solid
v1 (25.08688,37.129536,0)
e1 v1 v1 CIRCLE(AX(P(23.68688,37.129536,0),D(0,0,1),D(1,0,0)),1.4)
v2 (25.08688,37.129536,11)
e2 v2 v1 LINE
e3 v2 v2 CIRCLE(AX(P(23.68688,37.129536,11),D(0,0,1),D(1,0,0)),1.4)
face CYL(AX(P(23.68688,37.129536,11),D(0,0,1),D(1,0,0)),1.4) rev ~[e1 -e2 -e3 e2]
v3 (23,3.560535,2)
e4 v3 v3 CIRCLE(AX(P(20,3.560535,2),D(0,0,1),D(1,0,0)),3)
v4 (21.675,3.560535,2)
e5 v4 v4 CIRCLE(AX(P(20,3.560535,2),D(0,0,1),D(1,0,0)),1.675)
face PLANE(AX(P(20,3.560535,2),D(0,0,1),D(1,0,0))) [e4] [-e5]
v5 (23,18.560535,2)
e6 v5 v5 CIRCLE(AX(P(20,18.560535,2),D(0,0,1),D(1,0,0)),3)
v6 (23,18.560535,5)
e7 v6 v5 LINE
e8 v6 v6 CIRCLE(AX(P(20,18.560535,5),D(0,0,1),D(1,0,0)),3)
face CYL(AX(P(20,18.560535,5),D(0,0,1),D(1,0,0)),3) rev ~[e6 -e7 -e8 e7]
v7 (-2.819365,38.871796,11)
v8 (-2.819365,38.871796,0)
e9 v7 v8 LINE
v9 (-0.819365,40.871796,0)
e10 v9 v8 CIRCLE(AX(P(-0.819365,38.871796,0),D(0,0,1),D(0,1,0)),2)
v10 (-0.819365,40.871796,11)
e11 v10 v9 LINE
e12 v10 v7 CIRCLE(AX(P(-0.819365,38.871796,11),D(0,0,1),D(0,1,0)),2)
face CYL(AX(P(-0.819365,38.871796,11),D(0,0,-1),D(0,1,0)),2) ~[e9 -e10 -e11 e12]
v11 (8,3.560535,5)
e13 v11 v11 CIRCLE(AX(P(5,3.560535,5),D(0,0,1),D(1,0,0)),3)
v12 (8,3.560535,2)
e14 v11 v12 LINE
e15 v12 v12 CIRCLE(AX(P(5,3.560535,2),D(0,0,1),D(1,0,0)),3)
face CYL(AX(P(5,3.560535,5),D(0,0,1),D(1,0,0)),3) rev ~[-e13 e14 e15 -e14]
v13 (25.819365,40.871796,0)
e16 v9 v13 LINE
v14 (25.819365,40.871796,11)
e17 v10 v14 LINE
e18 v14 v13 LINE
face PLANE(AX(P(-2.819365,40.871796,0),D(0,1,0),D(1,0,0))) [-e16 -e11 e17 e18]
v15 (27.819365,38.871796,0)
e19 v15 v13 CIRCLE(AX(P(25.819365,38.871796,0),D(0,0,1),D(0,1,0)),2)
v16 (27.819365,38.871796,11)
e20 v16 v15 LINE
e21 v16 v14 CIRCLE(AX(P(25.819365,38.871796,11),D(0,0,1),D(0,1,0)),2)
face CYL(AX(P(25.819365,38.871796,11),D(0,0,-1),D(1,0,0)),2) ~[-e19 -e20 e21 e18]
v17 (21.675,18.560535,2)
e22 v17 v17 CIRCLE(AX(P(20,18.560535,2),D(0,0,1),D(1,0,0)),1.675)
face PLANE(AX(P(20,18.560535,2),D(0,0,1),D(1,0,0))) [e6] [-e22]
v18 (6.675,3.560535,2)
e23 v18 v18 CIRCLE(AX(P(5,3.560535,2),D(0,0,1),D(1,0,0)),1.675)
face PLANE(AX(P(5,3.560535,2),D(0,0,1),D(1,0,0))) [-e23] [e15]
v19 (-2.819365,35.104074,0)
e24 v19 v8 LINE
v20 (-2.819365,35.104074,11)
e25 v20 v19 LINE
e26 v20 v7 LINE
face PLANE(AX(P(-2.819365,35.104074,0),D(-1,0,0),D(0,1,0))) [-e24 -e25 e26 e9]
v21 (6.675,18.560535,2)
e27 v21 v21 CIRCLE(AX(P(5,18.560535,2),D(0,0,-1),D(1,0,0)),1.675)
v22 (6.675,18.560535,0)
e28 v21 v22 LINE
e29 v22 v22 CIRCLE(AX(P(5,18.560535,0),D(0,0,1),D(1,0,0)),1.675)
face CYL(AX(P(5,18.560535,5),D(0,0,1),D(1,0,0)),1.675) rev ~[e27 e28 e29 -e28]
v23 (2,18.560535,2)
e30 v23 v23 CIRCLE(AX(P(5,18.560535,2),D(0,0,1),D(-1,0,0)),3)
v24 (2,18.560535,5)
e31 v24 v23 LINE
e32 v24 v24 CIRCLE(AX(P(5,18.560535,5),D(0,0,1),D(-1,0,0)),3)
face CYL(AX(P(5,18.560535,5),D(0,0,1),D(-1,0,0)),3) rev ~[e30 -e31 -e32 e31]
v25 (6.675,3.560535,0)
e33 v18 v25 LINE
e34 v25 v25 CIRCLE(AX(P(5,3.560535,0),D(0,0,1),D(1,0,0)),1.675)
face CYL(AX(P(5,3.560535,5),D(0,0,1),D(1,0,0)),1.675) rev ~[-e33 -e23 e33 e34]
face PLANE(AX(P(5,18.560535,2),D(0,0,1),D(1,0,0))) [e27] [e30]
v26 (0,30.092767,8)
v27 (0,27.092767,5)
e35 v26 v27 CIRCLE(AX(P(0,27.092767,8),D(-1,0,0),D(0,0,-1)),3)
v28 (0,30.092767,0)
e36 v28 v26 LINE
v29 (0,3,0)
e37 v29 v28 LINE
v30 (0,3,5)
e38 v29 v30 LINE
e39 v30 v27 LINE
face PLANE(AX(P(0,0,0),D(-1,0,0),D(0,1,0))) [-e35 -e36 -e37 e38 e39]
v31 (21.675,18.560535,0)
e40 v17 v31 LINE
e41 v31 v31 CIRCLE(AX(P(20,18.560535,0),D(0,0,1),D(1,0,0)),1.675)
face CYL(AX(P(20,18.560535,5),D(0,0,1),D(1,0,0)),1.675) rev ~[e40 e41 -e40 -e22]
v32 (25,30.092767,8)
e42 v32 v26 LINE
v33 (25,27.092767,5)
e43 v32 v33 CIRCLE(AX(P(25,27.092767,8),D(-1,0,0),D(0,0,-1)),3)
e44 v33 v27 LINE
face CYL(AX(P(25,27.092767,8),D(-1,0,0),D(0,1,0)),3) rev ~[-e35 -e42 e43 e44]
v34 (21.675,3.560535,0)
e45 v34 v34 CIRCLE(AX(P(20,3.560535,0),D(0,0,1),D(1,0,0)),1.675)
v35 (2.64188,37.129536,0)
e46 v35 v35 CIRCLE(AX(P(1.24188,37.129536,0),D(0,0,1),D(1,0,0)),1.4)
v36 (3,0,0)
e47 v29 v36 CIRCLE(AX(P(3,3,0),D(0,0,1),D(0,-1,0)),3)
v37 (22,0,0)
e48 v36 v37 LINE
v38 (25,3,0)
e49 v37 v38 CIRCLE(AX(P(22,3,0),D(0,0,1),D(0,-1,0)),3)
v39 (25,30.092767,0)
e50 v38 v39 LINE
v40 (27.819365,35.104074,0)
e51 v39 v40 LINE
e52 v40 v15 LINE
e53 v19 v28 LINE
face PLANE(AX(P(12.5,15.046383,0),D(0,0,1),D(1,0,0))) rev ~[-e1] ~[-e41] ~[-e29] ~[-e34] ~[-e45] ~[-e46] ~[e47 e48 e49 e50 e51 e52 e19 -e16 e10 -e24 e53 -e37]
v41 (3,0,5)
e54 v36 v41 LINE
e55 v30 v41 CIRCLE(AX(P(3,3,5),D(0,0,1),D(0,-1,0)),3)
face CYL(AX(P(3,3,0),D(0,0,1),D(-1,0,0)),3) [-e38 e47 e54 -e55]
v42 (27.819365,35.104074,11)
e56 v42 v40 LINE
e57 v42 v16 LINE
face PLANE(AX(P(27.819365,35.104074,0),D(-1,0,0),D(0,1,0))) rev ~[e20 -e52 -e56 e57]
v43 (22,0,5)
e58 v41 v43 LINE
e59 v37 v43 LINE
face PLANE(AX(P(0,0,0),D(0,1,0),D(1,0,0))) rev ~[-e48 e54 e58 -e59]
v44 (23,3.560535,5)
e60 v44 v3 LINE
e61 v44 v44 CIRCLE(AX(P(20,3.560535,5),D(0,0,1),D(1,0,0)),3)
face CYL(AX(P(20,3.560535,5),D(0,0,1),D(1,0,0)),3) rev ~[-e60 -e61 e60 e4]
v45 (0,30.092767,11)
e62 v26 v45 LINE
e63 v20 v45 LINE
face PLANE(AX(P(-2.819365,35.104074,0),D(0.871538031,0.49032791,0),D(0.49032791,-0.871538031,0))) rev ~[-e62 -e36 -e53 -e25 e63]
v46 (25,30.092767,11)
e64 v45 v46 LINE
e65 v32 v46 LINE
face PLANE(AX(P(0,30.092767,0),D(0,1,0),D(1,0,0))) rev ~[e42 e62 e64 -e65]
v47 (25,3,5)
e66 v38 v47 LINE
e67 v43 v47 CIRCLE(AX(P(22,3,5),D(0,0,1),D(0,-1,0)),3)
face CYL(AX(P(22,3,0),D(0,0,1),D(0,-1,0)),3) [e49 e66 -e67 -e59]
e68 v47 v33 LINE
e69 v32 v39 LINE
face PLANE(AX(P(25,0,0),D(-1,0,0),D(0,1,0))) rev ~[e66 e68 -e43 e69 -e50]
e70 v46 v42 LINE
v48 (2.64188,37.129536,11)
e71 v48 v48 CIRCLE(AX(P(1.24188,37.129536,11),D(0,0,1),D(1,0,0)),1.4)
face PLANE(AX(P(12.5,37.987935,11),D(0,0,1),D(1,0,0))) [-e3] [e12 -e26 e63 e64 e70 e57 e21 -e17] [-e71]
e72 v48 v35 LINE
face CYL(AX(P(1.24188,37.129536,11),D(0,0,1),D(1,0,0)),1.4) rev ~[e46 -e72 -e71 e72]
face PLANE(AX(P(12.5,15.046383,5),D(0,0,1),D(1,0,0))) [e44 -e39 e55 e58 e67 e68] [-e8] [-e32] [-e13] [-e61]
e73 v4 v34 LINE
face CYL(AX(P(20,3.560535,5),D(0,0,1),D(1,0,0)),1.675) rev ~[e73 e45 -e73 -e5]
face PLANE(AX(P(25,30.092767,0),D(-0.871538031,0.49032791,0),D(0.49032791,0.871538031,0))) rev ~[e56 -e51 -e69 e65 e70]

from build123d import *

# Parameters (mm, degrees)
F0_W     = 25
F0_H     = 30.0927665085
F0_W_2   = 30.6387297809
F0_H_2   = 5.7677225769
F1_DEPTH = 5
F2_R     = 1.675
F3_DEPTH = 25
F4_R     = 3
F5_DEPTH = 11
F6_R     = 1.4
F7_DEPTH = 11.001
F2_R_2   = 3
F8_DEPTH = 3
F9_R     = 3
F10_R    = 2


# Not quite as in the source:
# - a feature names something its author has since deleted; it is built from what else it names


with BuildPart() as f1:
    # F0 (on Top) → F1 (new body)
    with BuildSketch(Plane.XY):
        with Locations((12.5, 15.0463832542)):
            Rectangle(F0_W, F0_H)
        Polygon((-2.8193648905, 35.1040735841), (0, 30.0927665085), (25, 30.0927665085), (27.8193648905, 35.1040735841), align=None)
        with Locations((12.5, 37.9879348725)):
            Rectangle(F0_W_2, F0_H_2)
    extrude(amount=F1_DEPTH)

    # F2 (on face) → F3 (cut)
    with BuildSketch(Plane.XY.offset(5)):
        with BuildLine():
            ThreePointArc((3.325, 18.5605346784), (5, 16.8855346784), (6.675, 18.5605346784))
            ThreePointArc((6.675, 18.5605346784), (5, 20.2355346784), (3.325, 18.5605346784))
        make_face()
        with Locations((20, 18.5605346784)):
            Circle(F2_R)
        with Locations((20, 3.5605346784)):
            Circle(F2_R)
        with Locations((5, 3.5605346784)):
            Circle(F2_R)
    extrude(amount=-F3_DEPTH, mode=Mode.SUBTRACT)

    # F4
    f4_edges = [f1.edges().sort_by_distance(p)[0] for p in [
        (0, 0, 2.5),
        (25, 0, 2.5),
    ]]
    fillet(f4_edges, radius=F4_R)

    # F0 (on Top) → F5 (join)
    with BuildSketch(Plane.XY):
        with Locations((12.5, 37.9879348725)):
            Rectangle(F0_W_2, F0_H_2)
        Polygon((-2.8193648905, 35.1040735841), (0, 30.0927665085), (25, 30.0927665085), (27.8193648905, 35.1040735841), align=None)
    extrude(amount=F5_DEPTH)

    # F6 (on face) → F7 (cut, through all)
    with BuildSketch(Plane.XY.offset(11)):
        with Locations((23.6868802458, 37.1295362711)):
            Circle(F6_R)
        with BuildLine():
            ThreePointArc((-0.1581197542, 37.1295362711), (1.2418802458, 35.7295362711), (2.6418802458, 37.1295362711))
            ThreePointArc((2.6418802458, 37.1295362711), (1.2418802458, 38.5295362711), (-0.1581197542, 37.1295362711))
        make_face()
    extrude(amount=-F7_DEPTH, mode=Mode.SUBTRACT)

    # F2 (on face) → F8 (cut)
    with BuildSketch(Plane.XY.offset(5)):
        with BuildLine():
            ThreePointArc((8, 18.5605346784), (5, 21.5605346784), (2, 18.5605346784))
            ThreePointArc((2, 18.5605346784), (5, 15.5605346784), (8, 18.5605346784))
        make_face()
        with BuildLine():
            ThreePointArc((3.325, 18.5605346784), (5, 20.2355346784), (6.675, 18.5605346784))
            ThreePointArc((6.675, 18.5605346784), (5, 16.8855346784), (3.325, 18.5605346784))
        make_face(mode=Mode.SUBTRACT)
        with Locations((5, 3.5605346784)):
            Circle(F2_R_2)
        with Locations((5, 3.5605346784)):
            Circle(F2_R, mode=Mode.SUBTRACT)
        with Locations((20, 18.5605346784)):
            Circle(F2_R_2)
        with Locations((20, 18.5605346784)):
            Circle(F2_R, mode=Mode.SUBTRACT)
        with Locations((20, 3.5605346784)):
            Circle(F2_R_2)
        with Locations((20, 3.5605346784)):
            Circle(F2_R, mode=Mode.SUBTRACT)
    extrude(amount=-F8_DEPTH, mode=Mode.SUBTRACT)

    # F9
    f9_edges = [f1.edges().sort_by_distance(p)[0] for p in [
        (12.5, 30.092767, 5),
    ]]
    fillet(f9_edges, radius=F9_R)

    # F10
    f10_edges = [f1.edges().sort_by_distance(p)[0] for p in [
        (27.819365, 40.871796, 5.5),
        (-2.819365, 40.871796, 5.5),
    ]]
    fillet(f10_edges, radius=F10_R)


solid = f1.part
